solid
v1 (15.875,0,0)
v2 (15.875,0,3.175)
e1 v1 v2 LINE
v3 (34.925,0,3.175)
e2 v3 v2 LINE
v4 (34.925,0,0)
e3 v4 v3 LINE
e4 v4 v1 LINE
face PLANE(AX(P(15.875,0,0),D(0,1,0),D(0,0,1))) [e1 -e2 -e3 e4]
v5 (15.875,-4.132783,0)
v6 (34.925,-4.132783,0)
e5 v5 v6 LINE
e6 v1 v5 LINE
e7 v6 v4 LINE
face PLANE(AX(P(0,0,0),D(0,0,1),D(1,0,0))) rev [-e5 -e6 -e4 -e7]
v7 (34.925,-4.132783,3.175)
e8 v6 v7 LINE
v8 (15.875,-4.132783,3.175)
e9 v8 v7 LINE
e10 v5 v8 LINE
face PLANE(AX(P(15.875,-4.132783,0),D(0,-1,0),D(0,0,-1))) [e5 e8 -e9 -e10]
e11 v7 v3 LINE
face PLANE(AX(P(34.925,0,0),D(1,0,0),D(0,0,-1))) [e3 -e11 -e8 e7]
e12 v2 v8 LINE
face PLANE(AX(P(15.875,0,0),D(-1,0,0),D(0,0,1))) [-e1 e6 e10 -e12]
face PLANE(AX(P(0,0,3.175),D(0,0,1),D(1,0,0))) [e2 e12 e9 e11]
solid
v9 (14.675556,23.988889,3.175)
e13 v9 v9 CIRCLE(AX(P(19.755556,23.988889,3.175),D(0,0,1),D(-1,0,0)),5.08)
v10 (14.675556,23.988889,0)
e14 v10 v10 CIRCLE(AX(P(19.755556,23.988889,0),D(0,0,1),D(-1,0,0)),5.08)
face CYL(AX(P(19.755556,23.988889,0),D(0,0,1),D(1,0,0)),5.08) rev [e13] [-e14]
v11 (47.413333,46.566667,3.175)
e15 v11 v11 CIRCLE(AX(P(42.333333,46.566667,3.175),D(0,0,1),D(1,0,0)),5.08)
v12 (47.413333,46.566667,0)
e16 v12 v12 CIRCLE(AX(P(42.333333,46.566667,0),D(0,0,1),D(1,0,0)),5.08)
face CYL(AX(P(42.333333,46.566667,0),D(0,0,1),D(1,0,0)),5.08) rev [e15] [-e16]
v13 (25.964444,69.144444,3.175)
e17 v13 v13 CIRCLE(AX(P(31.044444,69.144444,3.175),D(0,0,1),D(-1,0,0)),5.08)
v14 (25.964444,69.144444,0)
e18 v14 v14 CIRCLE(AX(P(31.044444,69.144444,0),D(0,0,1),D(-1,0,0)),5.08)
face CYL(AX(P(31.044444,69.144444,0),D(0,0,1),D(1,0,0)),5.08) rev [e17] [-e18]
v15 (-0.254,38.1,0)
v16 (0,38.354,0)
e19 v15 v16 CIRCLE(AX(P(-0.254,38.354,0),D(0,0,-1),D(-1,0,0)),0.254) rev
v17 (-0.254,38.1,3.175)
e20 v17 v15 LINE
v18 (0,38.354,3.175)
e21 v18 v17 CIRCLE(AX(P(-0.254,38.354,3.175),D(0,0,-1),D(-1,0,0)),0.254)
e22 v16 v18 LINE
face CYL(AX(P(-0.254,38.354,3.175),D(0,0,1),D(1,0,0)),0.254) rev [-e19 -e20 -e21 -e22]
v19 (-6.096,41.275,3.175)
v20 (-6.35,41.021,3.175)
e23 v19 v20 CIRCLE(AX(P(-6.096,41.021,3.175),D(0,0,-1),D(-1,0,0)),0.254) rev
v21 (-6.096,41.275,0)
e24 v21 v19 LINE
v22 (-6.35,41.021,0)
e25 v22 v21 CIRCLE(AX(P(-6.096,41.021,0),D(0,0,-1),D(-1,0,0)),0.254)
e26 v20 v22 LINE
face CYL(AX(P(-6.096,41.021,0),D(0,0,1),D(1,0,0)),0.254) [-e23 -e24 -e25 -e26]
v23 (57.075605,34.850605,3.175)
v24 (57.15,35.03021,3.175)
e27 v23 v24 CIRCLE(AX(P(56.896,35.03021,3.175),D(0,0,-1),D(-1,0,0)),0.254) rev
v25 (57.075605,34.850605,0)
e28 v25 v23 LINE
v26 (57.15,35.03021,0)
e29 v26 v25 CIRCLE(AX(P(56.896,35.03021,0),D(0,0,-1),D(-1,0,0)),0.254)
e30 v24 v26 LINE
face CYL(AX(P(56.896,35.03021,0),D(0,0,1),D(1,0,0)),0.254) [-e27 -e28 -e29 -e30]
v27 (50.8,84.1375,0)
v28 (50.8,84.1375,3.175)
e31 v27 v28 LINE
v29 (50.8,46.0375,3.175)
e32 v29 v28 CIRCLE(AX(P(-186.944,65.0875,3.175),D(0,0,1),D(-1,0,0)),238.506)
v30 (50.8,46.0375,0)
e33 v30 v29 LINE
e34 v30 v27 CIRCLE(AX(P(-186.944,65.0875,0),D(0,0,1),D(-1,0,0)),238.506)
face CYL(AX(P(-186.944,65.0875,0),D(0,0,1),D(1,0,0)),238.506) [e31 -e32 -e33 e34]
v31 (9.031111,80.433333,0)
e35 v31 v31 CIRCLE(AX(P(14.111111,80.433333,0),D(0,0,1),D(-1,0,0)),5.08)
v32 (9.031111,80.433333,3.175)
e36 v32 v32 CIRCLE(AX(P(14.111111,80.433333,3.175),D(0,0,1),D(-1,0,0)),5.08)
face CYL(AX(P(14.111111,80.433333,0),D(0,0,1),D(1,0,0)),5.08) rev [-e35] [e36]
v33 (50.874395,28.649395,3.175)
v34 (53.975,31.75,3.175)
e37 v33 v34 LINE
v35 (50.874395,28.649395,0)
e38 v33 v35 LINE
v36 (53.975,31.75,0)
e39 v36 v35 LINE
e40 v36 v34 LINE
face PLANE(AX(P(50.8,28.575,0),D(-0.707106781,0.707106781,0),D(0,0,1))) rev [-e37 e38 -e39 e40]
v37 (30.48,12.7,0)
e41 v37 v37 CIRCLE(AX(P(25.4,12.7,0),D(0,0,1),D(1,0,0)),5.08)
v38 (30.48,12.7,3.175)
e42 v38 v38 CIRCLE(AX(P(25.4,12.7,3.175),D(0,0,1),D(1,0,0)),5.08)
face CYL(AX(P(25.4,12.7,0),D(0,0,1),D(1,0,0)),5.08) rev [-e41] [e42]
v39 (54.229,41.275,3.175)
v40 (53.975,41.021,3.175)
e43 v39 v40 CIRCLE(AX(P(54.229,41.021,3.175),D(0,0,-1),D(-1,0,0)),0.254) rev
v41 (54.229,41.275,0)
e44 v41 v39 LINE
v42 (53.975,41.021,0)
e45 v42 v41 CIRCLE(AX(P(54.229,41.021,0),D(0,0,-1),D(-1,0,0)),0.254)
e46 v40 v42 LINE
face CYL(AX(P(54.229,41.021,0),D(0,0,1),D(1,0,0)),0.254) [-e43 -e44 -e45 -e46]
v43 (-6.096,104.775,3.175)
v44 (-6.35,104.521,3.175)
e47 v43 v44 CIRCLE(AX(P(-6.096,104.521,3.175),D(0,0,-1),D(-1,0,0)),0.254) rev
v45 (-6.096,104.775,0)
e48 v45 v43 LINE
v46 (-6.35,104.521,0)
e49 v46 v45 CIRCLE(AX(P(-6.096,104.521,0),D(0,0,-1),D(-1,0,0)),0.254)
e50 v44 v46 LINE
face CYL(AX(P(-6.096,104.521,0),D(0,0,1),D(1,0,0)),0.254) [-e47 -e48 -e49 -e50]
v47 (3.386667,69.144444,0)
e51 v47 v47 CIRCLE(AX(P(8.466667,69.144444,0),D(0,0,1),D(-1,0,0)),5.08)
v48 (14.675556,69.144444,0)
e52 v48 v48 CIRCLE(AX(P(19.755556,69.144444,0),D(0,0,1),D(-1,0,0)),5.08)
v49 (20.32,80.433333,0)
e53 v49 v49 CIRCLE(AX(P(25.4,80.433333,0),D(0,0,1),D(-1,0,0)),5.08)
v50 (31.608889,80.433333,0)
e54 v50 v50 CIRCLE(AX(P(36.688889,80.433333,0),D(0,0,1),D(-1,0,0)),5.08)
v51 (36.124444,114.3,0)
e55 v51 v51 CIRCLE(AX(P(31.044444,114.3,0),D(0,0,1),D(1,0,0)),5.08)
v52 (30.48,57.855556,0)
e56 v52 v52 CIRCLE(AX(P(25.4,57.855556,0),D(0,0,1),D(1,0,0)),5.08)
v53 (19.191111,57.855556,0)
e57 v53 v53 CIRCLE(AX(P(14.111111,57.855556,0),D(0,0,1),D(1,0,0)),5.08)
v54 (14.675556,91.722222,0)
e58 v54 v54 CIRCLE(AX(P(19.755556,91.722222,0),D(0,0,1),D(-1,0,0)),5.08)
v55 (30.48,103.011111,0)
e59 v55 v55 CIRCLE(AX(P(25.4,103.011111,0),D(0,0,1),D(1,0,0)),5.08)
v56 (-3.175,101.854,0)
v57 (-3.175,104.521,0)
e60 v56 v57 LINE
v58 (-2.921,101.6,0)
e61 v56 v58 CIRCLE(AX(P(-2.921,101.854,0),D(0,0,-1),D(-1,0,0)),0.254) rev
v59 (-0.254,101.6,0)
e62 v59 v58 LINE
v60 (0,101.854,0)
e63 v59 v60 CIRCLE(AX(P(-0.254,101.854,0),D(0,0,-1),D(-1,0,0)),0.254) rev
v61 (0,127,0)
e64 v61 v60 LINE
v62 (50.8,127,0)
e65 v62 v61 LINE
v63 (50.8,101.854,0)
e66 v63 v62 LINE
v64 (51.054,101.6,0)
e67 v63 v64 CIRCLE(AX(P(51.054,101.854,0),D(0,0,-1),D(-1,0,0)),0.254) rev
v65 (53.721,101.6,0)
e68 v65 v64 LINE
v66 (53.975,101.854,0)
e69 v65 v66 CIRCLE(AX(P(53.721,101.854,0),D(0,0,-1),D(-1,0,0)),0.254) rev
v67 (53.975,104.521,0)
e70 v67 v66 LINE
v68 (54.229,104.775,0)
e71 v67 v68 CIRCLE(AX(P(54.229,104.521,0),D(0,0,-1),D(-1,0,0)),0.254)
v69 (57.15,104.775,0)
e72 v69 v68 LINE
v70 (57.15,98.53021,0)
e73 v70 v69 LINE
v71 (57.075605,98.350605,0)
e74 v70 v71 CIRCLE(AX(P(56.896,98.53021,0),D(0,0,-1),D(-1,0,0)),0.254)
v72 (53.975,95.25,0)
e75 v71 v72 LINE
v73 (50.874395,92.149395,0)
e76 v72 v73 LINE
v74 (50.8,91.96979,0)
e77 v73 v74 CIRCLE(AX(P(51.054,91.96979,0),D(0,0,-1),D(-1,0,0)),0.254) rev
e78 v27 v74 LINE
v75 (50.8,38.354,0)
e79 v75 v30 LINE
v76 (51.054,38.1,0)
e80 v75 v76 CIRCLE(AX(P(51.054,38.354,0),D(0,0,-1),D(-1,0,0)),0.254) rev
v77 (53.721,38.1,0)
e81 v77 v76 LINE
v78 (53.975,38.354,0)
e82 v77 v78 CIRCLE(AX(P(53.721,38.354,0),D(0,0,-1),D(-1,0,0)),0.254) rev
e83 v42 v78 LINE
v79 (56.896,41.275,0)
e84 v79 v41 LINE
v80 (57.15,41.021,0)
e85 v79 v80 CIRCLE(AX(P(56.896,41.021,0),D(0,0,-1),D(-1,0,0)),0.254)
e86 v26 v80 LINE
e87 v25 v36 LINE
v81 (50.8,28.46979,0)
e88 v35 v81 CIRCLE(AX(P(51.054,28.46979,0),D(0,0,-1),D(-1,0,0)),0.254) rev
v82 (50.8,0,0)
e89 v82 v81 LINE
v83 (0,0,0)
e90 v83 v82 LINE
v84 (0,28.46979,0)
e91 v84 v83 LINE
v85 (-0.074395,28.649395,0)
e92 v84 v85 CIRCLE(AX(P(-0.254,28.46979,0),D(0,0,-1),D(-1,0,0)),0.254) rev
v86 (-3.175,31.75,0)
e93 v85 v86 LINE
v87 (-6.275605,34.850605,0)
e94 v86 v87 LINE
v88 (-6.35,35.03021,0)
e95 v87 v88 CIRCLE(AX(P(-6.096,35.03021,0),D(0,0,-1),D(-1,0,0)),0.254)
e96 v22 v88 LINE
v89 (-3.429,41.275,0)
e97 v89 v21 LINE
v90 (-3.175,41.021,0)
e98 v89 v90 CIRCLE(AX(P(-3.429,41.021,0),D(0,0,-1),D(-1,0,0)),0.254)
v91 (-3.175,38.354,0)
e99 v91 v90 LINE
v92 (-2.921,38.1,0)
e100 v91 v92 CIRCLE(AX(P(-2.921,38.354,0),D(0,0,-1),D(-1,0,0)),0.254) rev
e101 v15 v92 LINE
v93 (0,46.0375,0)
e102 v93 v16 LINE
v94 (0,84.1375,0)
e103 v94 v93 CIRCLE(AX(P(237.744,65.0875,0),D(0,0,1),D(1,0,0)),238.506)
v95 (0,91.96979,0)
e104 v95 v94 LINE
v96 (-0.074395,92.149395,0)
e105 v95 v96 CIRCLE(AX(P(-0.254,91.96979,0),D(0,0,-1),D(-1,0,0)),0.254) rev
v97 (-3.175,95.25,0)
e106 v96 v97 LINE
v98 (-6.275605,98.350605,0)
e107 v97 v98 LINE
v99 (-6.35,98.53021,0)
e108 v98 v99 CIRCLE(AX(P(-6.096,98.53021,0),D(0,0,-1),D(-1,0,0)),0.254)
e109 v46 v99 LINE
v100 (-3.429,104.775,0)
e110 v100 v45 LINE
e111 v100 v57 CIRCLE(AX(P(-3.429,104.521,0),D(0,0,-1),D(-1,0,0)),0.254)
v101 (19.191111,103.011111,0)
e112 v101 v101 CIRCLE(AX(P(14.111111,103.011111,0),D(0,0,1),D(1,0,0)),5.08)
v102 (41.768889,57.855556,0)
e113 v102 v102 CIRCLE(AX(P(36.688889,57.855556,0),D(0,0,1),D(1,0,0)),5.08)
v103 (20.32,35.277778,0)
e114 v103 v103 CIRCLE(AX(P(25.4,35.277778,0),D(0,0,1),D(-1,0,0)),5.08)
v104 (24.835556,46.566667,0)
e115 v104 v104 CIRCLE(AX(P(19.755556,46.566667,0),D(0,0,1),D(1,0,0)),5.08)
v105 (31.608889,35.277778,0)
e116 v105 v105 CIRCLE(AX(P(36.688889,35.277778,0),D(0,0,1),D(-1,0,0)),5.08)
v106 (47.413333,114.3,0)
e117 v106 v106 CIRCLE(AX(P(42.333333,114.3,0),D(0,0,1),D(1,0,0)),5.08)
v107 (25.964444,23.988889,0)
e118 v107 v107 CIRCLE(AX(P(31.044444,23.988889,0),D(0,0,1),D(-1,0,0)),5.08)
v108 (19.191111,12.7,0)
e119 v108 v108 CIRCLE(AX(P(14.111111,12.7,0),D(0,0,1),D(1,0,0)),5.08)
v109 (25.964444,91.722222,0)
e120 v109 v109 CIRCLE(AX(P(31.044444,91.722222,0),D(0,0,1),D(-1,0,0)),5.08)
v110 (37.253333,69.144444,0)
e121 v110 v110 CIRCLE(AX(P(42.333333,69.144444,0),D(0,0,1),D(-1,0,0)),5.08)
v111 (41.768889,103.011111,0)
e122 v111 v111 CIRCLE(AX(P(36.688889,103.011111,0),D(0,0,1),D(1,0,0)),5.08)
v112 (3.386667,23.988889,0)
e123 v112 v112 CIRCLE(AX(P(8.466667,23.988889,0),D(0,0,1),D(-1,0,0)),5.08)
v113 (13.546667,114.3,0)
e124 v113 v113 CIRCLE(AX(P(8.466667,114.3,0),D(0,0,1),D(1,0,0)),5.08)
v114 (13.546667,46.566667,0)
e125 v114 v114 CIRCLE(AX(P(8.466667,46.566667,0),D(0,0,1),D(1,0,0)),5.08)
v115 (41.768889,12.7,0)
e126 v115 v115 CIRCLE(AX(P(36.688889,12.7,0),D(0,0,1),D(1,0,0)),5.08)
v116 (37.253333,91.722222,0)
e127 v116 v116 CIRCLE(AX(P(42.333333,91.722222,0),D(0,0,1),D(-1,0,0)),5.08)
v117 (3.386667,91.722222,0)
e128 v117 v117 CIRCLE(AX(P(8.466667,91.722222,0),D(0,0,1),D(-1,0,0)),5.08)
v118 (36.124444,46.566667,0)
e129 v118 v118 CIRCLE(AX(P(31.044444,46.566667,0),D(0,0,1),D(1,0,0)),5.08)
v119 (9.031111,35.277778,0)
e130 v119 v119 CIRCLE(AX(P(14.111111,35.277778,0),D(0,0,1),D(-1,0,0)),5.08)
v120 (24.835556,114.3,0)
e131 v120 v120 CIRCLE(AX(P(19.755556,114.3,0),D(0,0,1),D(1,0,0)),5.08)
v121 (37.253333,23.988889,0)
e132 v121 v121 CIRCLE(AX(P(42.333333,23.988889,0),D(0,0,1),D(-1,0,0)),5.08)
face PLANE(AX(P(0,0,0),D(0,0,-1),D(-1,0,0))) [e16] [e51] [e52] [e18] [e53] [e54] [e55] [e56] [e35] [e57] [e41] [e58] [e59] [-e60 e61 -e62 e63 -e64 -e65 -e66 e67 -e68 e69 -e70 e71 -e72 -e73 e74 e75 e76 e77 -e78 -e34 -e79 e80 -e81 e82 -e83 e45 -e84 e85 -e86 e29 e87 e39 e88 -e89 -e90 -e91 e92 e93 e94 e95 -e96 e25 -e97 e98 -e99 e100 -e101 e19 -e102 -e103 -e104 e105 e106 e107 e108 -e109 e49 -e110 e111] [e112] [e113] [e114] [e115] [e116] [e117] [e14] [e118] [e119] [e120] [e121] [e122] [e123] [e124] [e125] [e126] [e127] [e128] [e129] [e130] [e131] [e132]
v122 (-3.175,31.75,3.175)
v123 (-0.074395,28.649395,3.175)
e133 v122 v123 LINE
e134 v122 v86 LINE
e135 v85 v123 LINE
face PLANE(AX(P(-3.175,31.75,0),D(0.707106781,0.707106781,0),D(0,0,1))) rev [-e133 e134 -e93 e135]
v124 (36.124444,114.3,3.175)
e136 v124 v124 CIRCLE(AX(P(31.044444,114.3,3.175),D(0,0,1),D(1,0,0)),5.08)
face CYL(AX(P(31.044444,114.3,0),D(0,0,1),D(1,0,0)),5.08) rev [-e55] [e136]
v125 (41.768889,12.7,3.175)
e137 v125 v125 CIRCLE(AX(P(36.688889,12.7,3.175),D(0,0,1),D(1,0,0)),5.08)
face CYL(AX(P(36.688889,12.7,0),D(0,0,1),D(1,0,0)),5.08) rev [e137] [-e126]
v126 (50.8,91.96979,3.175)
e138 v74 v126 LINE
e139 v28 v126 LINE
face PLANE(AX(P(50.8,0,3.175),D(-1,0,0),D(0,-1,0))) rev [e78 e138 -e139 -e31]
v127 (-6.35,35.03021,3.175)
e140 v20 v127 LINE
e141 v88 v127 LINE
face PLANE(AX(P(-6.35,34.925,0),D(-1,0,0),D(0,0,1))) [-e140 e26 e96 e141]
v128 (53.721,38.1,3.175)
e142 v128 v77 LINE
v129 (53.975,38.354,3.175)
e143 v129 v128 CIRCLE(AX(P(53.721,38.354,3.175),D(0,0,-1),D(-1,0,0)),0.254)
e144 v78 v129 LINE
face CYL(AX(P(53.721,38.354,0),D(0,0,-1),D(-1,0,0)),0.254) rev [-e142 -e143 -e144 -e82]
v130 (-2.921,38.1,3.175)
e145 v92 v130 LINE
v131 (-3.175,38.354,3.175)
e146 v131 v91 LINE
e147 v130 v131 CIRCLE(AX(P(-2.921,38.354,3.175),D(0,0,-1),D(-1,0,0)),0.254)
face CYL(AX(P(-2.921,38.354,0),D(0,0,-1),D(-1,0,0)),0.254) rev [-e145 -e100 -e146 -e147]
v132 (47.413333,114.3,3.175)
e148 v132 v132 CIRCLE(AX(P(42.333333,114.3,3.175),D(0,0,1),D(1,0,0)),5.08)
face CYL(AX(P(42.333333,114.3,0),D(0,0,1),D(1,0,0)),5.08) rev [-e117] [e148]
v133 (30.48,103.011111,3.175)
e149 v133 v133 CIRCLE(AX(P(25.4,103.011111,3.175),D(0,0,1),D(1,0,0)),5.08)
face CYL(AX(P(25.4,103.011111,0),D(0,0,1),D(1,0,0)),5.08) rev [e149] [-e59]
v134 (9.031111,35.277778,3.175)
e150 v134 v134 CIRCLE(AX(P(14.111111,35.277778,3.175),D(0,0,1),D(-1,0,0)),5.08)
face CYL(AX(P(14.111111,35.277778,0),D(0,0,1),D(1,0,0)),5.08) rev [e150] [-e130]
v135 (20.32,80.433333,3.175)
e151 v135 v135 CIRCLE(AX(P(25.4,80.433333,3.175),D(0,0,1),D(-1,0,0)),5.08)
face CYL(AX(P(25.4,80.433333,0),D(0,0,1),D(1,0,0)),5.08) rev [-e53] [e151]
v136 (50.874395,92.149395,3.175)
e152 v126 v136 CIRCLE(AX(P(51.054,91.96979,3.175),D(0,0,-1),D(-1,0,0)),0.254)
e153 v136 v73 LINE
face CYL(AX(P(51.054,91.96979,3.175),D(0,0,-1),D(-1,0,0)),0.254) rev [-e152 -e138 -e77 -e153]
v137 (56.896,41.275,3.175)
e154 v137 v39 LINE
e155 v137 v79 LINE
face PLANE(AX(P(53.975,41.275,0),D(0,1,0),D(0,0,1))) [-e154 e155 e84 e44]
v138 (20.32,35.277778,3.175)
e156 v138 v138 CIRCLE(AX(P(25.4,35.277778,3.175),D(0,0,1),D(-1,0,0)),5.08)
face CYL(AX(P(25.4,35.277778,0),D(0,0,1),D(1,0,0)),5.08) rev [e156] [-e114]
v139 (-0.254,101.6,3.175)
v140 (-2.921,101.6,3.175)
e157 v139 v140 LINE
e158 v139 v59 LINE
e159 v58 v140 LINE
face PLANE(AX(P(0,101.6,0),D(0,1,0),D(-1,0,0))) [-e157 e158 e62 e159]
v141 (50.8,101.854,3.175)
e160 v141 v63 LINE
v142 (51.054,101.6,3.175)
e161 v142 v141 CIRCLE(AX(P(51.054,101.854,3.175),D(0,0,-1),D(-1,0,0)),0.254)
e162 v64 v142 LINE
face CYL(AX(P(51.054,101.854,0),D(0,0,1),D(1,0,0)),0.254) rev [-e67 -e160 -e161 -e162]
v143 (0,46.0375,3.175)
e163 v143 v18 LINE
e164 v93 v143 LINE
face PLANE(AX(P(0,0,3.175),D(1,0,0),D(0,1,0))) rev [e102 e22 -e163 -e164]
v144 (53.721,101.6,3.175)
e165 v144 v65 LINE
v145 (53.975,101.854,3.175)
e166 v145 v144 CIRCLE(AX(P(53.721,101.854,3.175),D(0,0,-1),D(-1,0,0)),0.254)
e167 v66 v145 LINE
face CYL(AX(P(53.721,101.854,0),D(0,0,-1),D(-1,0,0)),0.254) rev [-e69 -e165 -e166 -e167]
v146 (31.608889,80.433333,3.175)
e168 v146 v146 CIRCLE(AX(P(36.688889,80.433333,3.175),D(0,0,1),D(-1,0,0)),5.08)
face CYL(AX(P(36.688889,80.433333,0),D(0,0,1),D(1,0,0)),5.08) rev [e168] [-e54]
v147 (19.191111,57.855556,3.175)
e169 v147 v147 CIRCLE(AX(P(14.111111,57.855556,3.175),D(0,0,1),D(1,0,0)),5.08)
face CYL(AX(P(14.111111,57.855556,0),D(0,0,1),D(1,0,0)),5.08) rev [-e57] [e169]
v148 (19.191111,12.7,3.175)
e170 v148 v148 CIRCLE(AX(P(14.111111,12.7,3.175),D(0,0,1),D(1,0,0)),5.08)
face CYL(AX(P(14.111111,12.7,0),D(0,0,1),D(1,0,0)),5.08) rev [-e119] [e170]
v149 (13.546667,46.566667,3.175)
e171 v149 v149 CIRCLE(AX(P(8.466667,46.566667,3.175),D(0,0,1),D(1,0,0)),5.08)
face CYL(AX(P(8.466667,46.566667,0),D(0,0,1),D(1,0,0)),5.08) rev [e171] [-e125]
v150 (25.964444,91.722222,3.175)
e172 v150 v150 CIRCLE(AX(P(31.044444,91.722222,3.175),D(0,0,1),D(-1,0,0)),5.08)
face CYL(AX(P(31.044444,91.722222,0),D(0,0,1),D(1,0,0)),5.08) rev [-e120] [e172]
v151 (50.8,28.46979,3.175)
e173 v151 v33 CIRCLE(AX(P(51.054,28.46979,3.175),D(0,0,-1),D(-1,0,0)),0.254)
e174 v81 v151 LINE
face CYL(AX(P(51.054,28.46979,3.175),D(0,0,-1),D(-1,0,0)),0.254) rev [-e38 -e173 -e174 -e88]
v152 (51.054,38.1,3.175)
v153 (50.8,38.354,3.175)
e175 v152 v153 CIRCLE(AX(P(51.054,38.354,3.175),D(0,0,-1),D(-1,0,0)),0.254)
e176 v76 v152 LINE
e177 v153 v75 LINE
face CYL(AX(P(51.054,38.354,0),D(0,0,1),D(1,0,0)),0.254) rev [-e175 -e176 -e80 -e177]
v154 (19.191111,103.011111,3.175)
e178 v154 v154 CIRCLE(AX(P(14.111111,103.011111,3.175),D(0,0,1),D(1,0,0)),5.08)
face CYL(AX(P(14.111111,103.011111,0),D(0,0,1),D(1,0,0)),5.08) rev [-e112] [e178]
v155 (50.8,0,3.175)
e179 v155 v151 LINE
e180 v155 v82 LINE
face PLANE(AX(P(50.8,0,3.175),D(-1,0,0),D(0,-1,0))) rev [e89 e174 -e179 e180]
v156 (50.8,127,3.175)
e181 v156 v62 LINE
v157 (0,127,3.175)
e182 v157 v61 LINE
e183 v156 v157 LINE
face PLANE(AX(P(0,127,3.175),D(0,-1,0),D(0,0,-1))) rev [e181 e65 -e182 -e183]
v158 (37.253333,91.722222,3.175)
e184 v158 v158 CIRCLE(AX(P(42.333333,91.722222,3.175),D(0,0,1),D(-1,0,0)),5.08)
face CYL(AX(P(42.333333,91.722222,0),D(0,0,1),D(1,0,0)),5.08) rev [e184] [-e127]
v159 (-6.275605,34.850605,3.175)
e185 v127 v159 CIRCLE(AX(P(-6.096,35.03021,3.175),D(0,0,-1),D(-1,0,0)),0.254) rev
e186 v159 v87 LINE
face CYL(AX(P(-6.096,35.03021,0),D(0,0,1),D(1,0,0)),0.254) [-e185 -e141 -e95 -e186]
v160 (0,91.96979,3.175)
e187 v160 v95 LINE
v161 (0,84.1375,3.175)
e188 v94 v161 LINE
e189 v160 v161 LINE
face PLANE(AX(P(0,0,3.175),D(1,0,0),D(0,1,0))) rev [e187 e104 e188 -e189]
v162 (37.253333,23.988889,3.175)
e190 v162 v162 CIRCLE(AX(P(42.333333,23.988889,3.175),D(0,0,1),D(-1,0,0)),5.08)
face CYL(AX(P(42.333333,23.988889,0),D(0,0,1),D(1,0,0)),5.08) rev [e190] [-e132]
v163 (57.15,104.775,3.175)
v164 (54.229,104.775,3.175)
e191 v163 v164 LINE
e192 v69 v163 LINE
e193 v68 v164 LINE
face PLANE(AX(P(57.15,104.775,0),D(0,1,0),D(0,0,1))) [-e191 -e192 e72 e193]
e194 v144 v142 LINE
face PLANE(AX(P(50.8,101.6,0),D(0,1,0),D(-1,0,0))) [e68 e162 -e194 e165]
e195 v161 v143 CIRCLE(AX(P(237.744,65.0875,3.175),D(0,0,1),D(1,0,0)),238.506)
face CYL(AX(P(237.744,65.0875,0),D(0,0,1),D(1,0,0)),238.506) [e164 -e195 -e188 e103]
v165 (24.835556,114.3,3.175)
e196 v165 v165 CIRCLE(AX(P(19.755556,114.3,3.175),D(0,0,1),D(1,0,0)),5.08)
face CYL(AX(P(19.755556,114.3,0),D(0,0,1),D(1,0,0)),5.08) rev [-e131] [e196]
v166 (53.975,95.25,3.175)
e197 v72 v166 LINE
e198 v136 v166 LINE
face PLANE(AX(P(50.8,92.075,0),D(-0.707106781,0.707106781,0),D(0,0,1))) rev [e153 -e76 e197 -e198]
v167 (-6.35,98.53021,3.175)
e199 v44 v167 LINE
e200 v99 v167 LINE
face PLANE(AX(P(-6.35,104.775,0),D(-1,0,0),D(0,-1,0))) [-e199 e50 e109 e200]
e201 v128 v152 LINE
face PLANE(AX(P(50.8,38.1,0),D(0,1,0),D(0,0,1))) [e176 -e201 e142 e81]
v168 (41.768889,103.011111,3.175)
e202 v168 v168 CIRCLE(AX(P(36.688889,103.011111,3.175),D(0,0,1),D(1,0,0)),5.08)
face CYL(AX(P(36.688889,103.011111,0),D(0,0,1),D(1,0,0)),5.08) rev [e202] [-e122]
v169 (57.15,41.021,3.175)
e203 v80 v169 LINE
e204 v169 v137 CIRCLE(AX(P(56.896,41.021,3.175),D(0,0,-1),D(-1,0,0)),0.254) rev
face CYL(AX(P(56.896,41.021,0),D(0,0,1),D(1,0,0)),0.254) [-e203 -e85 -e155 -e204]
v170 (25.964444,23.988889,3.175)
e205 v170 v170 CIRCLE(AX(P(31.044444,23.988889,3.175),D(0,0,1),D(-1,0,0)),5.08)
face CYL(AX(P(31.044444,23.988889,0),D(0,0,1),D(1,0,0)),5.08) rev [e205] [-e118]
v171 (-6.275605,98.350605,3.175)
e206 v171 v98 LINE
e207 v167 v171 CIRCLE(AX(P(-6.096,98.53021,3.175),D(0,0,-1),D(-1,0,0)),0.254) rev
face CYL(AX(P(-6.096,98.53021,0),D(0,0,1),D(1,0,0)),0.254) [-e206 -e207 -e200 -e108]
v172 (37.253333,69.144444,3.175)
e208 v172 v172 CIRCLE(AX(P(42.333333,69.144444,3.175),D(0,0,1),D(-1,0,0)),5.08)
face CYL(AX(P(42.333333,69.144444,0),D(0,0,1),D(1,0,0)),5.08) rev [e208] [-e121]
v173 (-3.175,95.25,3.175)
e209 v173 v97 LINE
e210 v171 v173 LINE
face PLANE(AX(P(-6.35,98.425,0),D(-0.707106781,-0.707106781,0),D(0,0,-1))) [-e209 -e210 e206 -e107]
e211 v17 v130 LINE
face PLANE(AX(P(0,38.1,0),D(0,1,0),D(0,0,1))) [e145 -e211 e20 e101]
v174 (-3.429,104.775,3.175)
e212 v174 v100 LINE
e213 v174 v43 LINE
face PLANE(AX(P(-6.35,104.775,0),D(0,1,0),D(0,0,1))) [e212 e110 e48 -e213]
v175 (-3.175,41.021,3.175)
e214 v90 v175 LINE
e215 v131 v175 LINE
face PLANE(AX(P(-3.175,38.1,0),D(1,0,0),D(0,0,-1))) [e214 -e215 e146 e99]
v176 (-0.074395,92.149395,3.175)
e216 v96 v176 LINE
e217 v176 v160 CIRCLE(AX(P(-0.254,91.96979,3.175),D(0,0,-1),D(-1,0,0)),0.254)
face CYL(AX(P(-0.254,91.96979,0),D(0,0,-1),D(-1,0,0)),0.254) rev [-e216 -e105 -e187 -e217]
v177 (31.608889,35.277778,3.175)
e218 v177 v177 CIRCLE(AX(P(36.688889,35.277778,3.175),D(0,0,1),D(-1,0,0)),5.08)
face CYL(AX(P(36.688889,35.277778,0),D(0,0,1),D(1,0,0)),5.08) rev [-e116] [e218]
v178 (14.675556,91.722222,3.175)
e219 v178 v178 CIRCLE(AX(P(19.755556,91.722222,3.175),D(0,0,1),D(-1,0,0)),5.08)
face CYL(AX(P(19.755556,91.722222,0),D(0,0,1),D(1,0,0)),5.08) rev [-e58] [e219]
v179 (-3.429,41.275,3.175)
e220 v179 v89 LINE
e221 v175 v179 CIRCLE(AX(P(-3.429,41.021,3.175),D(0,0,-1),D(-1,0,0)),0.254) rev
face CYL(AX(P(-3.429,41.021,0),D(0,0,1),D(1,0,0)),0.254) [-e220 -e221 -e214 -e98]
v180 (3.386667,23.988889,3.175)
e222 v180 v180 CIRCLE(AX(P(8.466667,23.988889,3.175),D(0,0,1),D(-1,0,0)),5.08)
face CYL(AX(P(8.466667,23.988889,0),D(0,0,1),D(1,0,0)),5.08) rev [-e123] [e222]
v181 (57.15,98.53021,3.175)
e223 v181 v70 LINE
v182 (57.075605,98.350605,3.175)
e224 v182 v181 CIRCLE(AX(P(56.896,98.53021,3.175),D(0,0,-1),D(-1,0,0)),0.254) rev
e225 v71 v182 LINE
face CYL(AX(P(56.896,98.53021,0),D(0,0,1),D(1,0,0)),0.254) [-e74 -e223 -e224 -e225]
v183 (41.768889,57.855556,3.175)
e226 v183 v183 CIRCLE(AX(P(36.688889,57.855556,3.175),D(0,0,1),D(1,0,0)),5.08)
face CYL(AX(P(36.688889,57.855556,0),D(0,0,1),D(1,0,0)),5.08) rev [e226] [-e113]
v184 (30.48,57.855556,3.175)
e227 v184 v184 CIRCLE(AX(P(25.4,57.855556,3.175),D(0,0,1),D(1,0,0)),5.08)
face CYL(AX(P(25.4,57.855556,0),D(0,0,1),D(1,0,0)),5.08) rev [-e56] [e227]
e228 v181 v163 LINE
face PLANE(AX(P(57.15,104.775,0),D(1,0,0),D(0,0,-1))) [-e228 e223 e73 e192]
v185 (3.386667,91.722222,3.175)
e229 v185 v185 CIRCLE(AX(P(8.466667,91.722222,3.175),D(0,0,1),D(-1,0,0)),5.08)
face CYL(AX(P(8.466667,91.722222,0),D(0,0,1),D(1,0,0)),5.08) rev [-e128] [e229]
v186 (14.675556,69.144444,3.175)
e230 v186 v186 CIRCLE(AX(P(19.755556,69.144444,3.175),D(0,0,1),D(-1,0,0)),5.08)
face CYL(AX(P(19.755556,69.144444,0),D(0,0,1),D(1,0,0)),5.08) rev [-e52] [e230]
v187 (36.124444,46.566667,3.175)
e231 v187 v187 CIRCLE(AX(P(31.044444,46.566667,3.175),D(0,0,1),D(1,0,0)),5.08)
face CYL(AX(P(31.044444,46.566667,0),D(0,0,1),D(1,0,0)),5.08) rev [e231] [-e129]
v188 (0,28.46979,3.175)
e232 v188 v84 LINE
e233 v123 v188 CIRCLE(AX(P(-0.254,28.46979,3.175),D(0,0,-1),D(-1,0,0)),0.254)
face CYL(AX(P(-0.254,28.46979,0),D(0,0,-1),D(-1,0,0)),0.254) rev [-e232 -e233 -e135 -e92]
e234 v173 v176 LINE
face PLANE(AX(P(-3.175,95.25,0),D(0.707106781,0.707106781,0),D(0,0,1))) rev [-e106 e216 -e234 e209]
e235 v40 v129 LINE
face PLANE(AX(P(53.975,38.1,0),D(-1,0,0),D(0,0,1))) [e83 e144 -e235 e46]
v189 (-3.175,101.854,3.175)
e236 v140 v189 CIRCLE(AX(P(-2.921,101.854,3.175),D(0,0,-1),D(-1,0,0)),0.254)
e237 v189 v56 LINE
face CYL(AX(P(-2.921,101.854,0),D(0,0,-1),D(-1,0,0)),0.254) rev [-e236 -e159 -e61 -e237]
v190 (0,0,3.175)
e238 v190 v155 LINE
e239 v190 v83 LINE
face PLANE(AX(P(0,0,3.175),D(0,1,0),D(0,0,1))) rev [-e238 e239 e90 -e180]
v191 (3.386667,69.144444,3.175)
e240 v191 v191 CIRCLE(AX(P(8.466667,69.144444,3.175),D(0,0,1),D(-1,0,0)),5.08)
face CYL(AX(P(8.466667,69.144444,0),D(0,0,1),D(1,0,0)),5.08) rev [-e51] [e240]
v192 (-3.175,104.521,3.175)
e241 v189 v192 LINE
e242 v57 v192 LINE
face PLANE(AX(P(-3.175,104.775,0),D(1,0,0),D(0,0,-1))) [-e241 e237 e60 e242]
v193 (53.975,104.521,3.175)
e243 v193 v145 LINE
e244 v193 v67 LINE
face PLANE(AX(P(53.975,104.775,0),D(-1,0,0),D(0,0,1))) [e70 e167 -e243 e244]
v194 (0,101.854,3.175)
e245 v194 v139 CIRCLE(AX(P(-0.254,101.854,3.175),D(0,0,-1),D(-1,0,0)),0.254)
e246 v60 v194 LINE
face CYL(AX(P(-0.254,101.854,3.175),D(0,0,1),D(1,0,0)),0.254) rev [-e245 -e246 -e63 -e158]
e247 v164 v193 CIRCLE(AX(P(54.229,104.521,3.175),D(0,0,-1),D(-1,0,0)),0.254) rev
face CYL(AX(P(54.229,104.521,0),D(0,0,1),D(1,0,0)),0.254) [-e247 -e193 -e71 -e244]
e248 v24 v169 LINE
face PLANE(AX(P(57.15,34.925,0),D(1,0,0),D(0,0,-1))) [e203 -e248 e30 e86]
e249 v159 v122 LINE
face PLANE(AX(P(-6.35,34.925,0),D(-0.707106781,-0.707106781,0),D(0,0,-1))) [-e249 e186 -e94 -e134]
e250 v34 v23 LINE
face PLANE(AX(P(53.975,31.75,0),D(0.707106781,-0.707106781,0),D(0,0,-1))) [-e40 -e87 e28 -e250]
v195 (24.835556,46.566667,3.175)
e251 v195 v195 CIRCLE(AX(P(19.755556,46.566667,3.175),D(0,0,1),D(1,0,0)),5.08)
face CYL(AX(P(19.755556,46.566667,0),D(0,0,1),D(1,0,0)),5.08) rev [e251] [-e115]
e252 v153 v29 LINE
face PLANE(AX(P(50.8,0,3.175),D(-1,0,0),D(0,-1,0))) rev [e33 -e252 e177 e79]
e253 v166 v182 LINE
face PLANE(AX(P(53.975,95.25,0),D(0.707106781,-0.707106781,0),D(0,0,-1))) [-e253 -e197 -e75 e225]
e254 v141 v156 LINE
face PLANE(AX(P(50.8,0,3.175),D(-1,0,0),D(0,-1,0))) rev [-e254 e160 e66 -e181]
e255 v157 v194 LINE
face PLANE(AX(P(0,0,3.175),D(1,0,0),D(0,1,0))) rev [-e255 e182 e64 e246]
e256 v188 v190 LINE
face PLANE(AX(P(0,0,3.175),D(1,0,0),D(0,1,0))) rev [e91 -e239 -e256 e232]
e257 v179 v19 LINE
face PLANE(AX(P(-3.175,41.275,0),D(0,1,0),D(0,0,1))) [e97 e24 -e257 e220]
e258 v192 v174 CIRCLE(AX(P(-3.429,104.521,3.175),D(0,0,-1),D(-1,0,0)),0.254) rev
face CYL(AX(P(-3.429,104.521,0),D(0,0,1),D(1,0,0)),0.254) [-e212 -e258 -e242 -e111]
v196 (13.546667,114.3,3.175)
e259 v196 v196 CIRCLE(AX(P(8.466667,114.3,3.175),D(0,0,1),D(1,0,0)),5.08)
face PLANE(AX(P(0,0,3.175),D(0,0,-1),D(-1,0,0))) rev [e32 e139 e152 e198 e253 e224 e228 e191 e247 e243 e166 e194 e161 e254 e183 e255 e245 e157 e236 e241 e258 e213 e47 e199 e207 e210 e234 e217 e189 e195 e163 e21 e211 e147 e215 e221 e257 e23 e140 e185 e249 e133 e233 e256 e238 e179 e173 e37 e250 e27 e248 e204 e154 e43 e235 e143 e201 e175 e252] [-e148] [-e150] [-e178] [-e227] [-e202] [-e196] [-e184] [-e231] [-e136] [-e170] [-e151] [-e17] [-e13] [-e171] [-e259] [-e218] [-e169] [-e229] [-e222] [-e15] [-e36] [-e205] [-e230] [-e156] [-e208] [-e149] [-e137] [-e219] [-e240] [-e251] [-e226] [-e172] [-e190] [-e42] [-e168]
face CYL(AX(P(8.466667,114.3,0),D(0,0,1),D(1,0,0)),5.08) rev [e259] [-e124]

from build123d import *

# Parameters (mm, degrees)
SKETCH1_W           = 50.8
SKETCH1_H           = 127
BOSS_EXTRUDE1_DEPTH = 3.175
SKETCH2_R           = 5.08
CUT_EXTRUDE1_DEPTH  = 3.175
SKETCH3_W           = 19.05
SKETCH3_H           = 4.13278272
BOSS_EXTRUDE2_DEPTH = 3.175
BOSS_EXTRUDE3_DEPTH = 3.175
CHAMFER1_SIZE       = 3.175
CHAMFER2_SIZE       = 3.175
BOSS_EXTRUDE4_DEPTH = 3.175
FILLET1_START       = -1
FILLET1_DEPTH       = 5
FILLET1_2_DEPTH     = 3.175


with BuildPart() as part:
    # Sketch1 → Boss-Extrude1 (new body)
    with BuildSketch(Plane.XY):
        with Locations((25.4, 63.5)):
            Rectangle(SKETCH1_W, SKETCH1_H)
    extrude(amount=BOSS_EXTRUDE1_DEPTH)

    # Sketch2 → Cut-Extrude1 (cut)
    with BuildSketch(Plane.XY.offset(3.175)):
        with Locations(Location((8.466666667, 91.722222222, 0), (0, 0, 180))):
            Circle(SKETCH2_R)
        with Locations(Location((19.755555556, 91.722222222, 0), (0, 0, 180))):
            Circle(SKETCH2_R)
        with Locations(Location((31.044444444, 91.722222222, 0), (0, 0, 180))):
            Circle(SKETCH2_R)
        with Locations(Location((42.333333333, 91.722222222, 0), (0, 0, 180))):
            Circle(SKETCH2_R)
        with Locations(Location((14.111111111, 80.433333333, 0), (0, 0, 180))):
            Circle(SKETCH2_R)
        with Locations(Location((25.4, 80.433333333, 0), (0, 0, 180))):
            Circle(SKETCH2_R)
        with Locations(Location((36.688888889, 80.433333333, 0), (0, 0, 180))):
            Circle(SKETCH2_R)
        with Locations(Location((42.333333333, 69.144444444, 0), (0, 0, 180))):
            Circle(SKETCH2_R)
        with Locations(Location((31.044444444, 69.144444444, 0), (0, 0, 180))):
            Circle(SKETCH2_R)
        with Locations(Location((19.755555556, 69.144444444, 0), (0, 0, 180))):
            Circle(SKETCH2_R)
        with Locations(Location((8.466666667, 69.144444444, 0), (0, 0, 180))):
            Circle(SKETCH2_R)
        with Locations(Location((8.466666667, 23.988888889, 0), (0, 0, 180))):
            Circle(SKETCH2_R)
        with Locations(Location((19.755555556, 23.988888889, 0), (0, 0, 180))):
            Circle(SKETCH2_R)
        with Locations(Location((31.044444444, 23.988888889, 0), (0, 0, 180))):
            Circle(SKETCH2_R)
        with Locations((19.755555556, 114.3)):
            Circle(SKETCH2_R)
        with Locations((8.466666667, 114.3)):
            Circle(SKETCH2_R)
        with Locations((31.044444444, 114.3)):
            Circle(SKETCH2_R)
        with Locations((42.333333333, 114.3)):
            Circle(SKETCH2_R)
        with Locations((25.4, 103.011111111)):
            Circle(SKETCH2_R)
        with Locations((36.688888889, 103.011111111)):
            Circle(SKETCH2_R)
        with Locations((14.111111111, 103.011111111)):
            Circle(SKETCH2_R)
        with Locations(Location((42.333333333, 23.988888889, 0), (0, 0, 180))):
            Circle(SKETCH2_R)
        with Locations(Location((36.688888889, 35.277777778, 0), (0, 0, 180))):
            Circle(SKETCH2_R)
        with Locations(Location((25.4, 35.277777778, 0), (0, 0, 180))):
            Circle(SKETCH2_R)
        with Locations(Location((14.111111111, 35.277777778, 0), (0, 0, 180))):
            Circle(SKETCH2_R)
        with Locations((36.688888889, 57.855555556)):
            Circle(SKETCH2_R)
        with Locations((25.4, 57.855555556)):
            Circle(SKETCH2_R)
        with Locations((14.111111111, 57.855555556)):
            Circle(SKETCH2_R)
        with Locations((42.333333333, 46.566666667)):
            Circle(SKETCH2_R)
        with Locations((31.044444444, 46.566666667)):
            Circle(SKETCH2_R)
        with Locations((19.755555556, 46.566666667)):
            Circle(SKETCH2_R)
        with Locations((8.466666667, 46.566666667)):
            Circle(SKETCH2_R)
        with Locations((14.111111111, 12.7)):
            Circle(SKETCH2_R)
        with Locations((25.4, 12.7)):
            Circle(SKETCH2_R)
        with Locations((36.688888889, 12.7)):
            Circle(SKETCH2_R)
    extrude(amount=-CUT_EXTRUDE1_DEPTH, mode=Mode.SUBTRACT)

    # Sketch4 → Boss-Extrude3 (add)
    with BuildSketch(Plane.XY.offset(3.175)):
        Polygon((0, 101.6), (-3.175, 101.6), (-3.175, 104.775), (-6.35, 104.775), (-6.35, 98.425), (-3.175, 98.425), (-3.175, 92.075), (0, 92.075), align=None)
        Polygon((53.975, 104.775), (53.975, 101.6), (50.8, 101.6), (50.8, 92.075), (53.975, 92.075), (53.975, 98.425), (57.15, 98.425), (57.15, 104.775), align=None)
        Polygon((0, 38.1), (-3.175, 38.1), (-3.175, 41.275), (-6.35, 41.275), (-6.35, 34.925), (-3.175, 34.925), (-3.175, 28.575), (0, 28.575), align=None)
        Polygon((57.15, 34.925), (57.15, 41.275), (53.975, 41.275), (53.975, 38.1), (50.8, 38.1), (50.8, 28.575), (53.975, 28.575), (53.975, 34.925), align=None)
    extrude(amount=-BOSS_EXTRUDE3_DEPTH)

    # Chamfer1
    chamfer1_edges = [part.edges().sort_by_distance(p)[0] for p in [
        (-3.175, 98.425, 1.5875),
        (-3.175, 34.925, 1.5875),
        (53.975, 34.925, 1.5875),
        (53.975, 98.425, 1.5875),
    ]]
    chamfer(chamfer1_edges, length=CHAMFER1_SIZE - 0.0001)  # a hair under: the kernel refuses the full size

    # Chamfer2
    chamfer2_edges = [part.edges().sort_by_distance(p)[0] for p in [
        (-3.175, 28.575, 1.5875),
        (53.975, 28.575, 1.5875),
        (53.975, 92.075, 1.5875),
        (-3.175, 92.075, 1.5875),
    ]]
    chamfer(chamfer2_edges, length=CHAMFER2_SIZE - 0.0001)  # a hair under: the kernel refuses the full size

    # Sketch5 → Boss-Extrude4 (add)
    with BuildSketch(Plane.XY.offset(3.175)):
        with BuildLine():
            Line((0, 84.1375), (0, 46.0375))
            ThreePointArc((0, 46.0375), (-0.762, 65.0875), (0, 84.1375))
        make_face()
        with BuildLine():
            Line((50.8, 84.1375), (50.8, 46.0375))
            ThreePointArc((50.8, 46.0375), (51.562, 65.0875), (50.8, 84.1375))
        make_face()
    extrude(amount=-BOSS_EXTRUDE4_DEPTH)

    # Fillet1: read off the stored shape, not the designer's step
    # Fillet1 outline → Fillet1 (cut)
    with BuildSketch(Plane.XY.offset(FILLET1_START)):
        with BuildLine():
            Line((-3.175, 41.275), (-3.429, 41.275))
            ThreePointArc((-3.429, 41.275), (-3.249394878, 41.200605122), (-3.175, 41.021))
            Line((-3.175, 41.021), (-3.175, 41.275))
        make_face()
        with BuildLine():
            Line((-6.35, 41.275), (-6.35, 41.021))
            ThreePointArc((-6.35, 41.021), (-6.275605122, 41.200605122), (-6.096, 41.275))
            Line((-6.096, 41.275), (-6.35, 41.275))
        make_face()
        with BuildLine():
            ThreePointArc((-6.275605122, 34.850605122), (-6.330665401, 34.933008653), (-6.35, 35.030210245))
            Line((-6.35, 35.030210245), (-6.35, 34.925))
            Line((-6.35, 34.925), (-6.275605122, 34.850605122))
        make_face()
        with BuildLine():
            Line((57.15, 34.925), (57.15, 35.030210245))
            ThreePointArc((57.15, 35.030210245), (57.130665401, 34.933008653), (57.075605122, 34.850605122))
            Line((57.075605122, 34.850605122), (57.15, 34.925))
        make_face()
        with BuildLine():
            Line((57.15, 41.275), (56.896, 41.275))
            ThreePointArc((56.896, 41.275), (57.075605122, 41.200605122), (57.15, 41.021))
            Line((57.15, 41.021), (57.15, 41.275))
        make_face()
        with BuildLine():
            Line((53.975, 41.275), (53.975, 41.021))
            ThreePointArc((53.975, 41.021), (54.049394878, 41.200605122), (54.229, 41.275))
            Line((54.229, 41.275), (53.975, 41.275))
        make_face()
        with BuildLine():
            Line((57.15, 98.425), (57.15, 98.530210245))
            ThreePointArc((57.15, 98.530210245), (57.130665401, 98.433008653), (57.075605122, 98.350605122))
            Line((57.075605122, 98.350605122), (57.15, 98.425))
        make_face()
        with BuildLine():
            Line((53.975, 104.775), (53.975, 104.521))
            ThreePointArc((53.975, 104.521), (54.049394878, 104.700605122), (54.229, 104.775))
            Line((54.229, 104.775), (53.975, 104.775))
        make_face()
        with BuildLine():
            Line((-3.175, 104.775), (-3.429, 104.775))
            ThreePointArc((-3.429, 104.775), (-3.249394878, 104.700605122), (-3.175, 104.521))
            Line((-3.175, 104.521), (-3.175, 104.775))
        make_face()
        with BuildLine():
            Line((-6.35, 104.775), (-6.35, 104.521))
            ThreePointArc((-6.35, 104.521), (-6.275605122, 104.700605122), (-6.096, 104.775))
            Line((-6.096, 104.775), (-6.35, 104.775))
        make_face()
        with BuildLine():
            Line((-6.35, 98.425), (-6.275605122, 98.350605122))
            ThreePointArc((-6.275605122, 98.350605122), (-6.330665401, 98.433008653), (-6.35, 98.530210245))
            Line((-6.35, 98.530210245), (-6.35, 98.425))
        make_face()
    extrude(amount=FILLET1_DEPTH, mode=Mode.SUBTRACT)

    # Fillet1 2 outline → Fillet1 2 (add)
    with BuildSketch(Plane.XY):
        with BuildLine():
            Line((0, 28.575), (-0.074394878, 28.649394878))
            ThreePointArc((-0.074394878, 28.649394878), (-0.019334599, 28.566991347), (0, 28.469789755))
            Line((0, 28.469789755), (0, 28.575))
        make_face()
        with BuildLine():
            ThreePointArc((0, 38.354), (-0.074394878, 38.174394878), (-0.254, 38.1))
            Line((-0.254, 38.1), (0, 38.1))
            Line((0, 38.1), (0, 38.354))
        make_face()
        with BuildLine():
            ThreePointArc((-2.921, 38.1), (-3.100605122, 38.174394878), (-3.175, 38.354))
            Line((-3.175, 38.354), (-3.175, 38.1))
            Line((-3.175, 38.1), (-2.921, 38.1))
        make_face()
        with BuildLine():
            ThreePointArc((50.8, 28.469789755), (50.819334599, 28.566991347), (50.874394878, 28.649394878))
            Line((50.874394878, 28.649394878), (50.8, 28.575))
            Line((50.8, 28.575), (50.8, 28.469789755))
        make_face()
        with BuildLine():
            ThreePointArc((53.975, 38.354), (53.900605122, 38.174394878), (53.721, 38.1))
            Line((53.721, 38.1), (53.975, 38.1))
            Line((53.975, 38.1), (53.975, 38.354))
        make_face()
        with BuildLine():
            ThreePointArc((51.054, 38.1), (50.874394878, 38.174394878), (50.8, 38.354))
            Line((50.8, 38.354), (50.8, 38.1))
            Line((50.8, 38.1), (51.054, 38.1))
        make_face()
        with BuildLine():
            Line((53.975, 101.6), (53.975, 101.854))
            ThreePointArc((53.975, 101.854), (53.900605122, 101.674394878), (53.721, 101.6))
            Line((53.721, 101.6), (53.975, 101.6))
        make_face()
        with BuildLine():
            ThreePointArc((50.8, 91.969789755), (50.819334599, 92.066991347), (50.874394878, 92.149394878))
            Line((50.874394878, 92.149394878), (50.8, 92.075))
            Line((50.8, 92.075), (50.8, 91.969789755))
        make_face()
        with BuildLine():
            Line((50.8, 101.6), (51.054, 101.6))
            ThreePointArc((51.054, 101.6), (50.874394878, 101.674394878), (50.8, 101.854))
            Line((50.8, 101.854), (50.8, 101.6))
        make_face()
        with BuildLine():
            Line((0, 92.075), (-0.074394878, 92.149394878))
            ThreePointArc((-0.074394878, 92.149394878), (-0.019334599, 92.066991347), (0, 91.969789755))
            Line((0, 91.969789755), (0, 92.075))
        make_face()
        with BuildLine():
            ThreePointArc((0, 101.854), (-0.074394878, 101.674394878), (-0.254, 101.6))
            Line((-0.254, 101.6), (0, 101.6))
            Line((0, 101.6), (0, 101.854))
        make_face()
        with BuildLine():
            ThreePointArc((-2.921, 101.6), (-3.100605122, 101.674394878), (-3.175, 101.854))
            Line((-3.175, 101.854), (-3.175, 101.6))
            Line((-3.175, 101.6), (-2.921, 101.6))
        make_face()
    extrude(amount=FILLET1_2_DEPTH)


with BuildPart() as body_2:
    # Sketch3 → Boss-Extrude2 (new body)
    with BuildSketch(Plane.XY.offset(3.175)):
        with Locations((25.4, -2.06639136)):
            Rectangle(SKETCH3_W, SKETCH3_H)
    extrude(amount=-BOSS_EXTRUDE2_DEPTH)


solid = Compound([part.part, body_2.part])
